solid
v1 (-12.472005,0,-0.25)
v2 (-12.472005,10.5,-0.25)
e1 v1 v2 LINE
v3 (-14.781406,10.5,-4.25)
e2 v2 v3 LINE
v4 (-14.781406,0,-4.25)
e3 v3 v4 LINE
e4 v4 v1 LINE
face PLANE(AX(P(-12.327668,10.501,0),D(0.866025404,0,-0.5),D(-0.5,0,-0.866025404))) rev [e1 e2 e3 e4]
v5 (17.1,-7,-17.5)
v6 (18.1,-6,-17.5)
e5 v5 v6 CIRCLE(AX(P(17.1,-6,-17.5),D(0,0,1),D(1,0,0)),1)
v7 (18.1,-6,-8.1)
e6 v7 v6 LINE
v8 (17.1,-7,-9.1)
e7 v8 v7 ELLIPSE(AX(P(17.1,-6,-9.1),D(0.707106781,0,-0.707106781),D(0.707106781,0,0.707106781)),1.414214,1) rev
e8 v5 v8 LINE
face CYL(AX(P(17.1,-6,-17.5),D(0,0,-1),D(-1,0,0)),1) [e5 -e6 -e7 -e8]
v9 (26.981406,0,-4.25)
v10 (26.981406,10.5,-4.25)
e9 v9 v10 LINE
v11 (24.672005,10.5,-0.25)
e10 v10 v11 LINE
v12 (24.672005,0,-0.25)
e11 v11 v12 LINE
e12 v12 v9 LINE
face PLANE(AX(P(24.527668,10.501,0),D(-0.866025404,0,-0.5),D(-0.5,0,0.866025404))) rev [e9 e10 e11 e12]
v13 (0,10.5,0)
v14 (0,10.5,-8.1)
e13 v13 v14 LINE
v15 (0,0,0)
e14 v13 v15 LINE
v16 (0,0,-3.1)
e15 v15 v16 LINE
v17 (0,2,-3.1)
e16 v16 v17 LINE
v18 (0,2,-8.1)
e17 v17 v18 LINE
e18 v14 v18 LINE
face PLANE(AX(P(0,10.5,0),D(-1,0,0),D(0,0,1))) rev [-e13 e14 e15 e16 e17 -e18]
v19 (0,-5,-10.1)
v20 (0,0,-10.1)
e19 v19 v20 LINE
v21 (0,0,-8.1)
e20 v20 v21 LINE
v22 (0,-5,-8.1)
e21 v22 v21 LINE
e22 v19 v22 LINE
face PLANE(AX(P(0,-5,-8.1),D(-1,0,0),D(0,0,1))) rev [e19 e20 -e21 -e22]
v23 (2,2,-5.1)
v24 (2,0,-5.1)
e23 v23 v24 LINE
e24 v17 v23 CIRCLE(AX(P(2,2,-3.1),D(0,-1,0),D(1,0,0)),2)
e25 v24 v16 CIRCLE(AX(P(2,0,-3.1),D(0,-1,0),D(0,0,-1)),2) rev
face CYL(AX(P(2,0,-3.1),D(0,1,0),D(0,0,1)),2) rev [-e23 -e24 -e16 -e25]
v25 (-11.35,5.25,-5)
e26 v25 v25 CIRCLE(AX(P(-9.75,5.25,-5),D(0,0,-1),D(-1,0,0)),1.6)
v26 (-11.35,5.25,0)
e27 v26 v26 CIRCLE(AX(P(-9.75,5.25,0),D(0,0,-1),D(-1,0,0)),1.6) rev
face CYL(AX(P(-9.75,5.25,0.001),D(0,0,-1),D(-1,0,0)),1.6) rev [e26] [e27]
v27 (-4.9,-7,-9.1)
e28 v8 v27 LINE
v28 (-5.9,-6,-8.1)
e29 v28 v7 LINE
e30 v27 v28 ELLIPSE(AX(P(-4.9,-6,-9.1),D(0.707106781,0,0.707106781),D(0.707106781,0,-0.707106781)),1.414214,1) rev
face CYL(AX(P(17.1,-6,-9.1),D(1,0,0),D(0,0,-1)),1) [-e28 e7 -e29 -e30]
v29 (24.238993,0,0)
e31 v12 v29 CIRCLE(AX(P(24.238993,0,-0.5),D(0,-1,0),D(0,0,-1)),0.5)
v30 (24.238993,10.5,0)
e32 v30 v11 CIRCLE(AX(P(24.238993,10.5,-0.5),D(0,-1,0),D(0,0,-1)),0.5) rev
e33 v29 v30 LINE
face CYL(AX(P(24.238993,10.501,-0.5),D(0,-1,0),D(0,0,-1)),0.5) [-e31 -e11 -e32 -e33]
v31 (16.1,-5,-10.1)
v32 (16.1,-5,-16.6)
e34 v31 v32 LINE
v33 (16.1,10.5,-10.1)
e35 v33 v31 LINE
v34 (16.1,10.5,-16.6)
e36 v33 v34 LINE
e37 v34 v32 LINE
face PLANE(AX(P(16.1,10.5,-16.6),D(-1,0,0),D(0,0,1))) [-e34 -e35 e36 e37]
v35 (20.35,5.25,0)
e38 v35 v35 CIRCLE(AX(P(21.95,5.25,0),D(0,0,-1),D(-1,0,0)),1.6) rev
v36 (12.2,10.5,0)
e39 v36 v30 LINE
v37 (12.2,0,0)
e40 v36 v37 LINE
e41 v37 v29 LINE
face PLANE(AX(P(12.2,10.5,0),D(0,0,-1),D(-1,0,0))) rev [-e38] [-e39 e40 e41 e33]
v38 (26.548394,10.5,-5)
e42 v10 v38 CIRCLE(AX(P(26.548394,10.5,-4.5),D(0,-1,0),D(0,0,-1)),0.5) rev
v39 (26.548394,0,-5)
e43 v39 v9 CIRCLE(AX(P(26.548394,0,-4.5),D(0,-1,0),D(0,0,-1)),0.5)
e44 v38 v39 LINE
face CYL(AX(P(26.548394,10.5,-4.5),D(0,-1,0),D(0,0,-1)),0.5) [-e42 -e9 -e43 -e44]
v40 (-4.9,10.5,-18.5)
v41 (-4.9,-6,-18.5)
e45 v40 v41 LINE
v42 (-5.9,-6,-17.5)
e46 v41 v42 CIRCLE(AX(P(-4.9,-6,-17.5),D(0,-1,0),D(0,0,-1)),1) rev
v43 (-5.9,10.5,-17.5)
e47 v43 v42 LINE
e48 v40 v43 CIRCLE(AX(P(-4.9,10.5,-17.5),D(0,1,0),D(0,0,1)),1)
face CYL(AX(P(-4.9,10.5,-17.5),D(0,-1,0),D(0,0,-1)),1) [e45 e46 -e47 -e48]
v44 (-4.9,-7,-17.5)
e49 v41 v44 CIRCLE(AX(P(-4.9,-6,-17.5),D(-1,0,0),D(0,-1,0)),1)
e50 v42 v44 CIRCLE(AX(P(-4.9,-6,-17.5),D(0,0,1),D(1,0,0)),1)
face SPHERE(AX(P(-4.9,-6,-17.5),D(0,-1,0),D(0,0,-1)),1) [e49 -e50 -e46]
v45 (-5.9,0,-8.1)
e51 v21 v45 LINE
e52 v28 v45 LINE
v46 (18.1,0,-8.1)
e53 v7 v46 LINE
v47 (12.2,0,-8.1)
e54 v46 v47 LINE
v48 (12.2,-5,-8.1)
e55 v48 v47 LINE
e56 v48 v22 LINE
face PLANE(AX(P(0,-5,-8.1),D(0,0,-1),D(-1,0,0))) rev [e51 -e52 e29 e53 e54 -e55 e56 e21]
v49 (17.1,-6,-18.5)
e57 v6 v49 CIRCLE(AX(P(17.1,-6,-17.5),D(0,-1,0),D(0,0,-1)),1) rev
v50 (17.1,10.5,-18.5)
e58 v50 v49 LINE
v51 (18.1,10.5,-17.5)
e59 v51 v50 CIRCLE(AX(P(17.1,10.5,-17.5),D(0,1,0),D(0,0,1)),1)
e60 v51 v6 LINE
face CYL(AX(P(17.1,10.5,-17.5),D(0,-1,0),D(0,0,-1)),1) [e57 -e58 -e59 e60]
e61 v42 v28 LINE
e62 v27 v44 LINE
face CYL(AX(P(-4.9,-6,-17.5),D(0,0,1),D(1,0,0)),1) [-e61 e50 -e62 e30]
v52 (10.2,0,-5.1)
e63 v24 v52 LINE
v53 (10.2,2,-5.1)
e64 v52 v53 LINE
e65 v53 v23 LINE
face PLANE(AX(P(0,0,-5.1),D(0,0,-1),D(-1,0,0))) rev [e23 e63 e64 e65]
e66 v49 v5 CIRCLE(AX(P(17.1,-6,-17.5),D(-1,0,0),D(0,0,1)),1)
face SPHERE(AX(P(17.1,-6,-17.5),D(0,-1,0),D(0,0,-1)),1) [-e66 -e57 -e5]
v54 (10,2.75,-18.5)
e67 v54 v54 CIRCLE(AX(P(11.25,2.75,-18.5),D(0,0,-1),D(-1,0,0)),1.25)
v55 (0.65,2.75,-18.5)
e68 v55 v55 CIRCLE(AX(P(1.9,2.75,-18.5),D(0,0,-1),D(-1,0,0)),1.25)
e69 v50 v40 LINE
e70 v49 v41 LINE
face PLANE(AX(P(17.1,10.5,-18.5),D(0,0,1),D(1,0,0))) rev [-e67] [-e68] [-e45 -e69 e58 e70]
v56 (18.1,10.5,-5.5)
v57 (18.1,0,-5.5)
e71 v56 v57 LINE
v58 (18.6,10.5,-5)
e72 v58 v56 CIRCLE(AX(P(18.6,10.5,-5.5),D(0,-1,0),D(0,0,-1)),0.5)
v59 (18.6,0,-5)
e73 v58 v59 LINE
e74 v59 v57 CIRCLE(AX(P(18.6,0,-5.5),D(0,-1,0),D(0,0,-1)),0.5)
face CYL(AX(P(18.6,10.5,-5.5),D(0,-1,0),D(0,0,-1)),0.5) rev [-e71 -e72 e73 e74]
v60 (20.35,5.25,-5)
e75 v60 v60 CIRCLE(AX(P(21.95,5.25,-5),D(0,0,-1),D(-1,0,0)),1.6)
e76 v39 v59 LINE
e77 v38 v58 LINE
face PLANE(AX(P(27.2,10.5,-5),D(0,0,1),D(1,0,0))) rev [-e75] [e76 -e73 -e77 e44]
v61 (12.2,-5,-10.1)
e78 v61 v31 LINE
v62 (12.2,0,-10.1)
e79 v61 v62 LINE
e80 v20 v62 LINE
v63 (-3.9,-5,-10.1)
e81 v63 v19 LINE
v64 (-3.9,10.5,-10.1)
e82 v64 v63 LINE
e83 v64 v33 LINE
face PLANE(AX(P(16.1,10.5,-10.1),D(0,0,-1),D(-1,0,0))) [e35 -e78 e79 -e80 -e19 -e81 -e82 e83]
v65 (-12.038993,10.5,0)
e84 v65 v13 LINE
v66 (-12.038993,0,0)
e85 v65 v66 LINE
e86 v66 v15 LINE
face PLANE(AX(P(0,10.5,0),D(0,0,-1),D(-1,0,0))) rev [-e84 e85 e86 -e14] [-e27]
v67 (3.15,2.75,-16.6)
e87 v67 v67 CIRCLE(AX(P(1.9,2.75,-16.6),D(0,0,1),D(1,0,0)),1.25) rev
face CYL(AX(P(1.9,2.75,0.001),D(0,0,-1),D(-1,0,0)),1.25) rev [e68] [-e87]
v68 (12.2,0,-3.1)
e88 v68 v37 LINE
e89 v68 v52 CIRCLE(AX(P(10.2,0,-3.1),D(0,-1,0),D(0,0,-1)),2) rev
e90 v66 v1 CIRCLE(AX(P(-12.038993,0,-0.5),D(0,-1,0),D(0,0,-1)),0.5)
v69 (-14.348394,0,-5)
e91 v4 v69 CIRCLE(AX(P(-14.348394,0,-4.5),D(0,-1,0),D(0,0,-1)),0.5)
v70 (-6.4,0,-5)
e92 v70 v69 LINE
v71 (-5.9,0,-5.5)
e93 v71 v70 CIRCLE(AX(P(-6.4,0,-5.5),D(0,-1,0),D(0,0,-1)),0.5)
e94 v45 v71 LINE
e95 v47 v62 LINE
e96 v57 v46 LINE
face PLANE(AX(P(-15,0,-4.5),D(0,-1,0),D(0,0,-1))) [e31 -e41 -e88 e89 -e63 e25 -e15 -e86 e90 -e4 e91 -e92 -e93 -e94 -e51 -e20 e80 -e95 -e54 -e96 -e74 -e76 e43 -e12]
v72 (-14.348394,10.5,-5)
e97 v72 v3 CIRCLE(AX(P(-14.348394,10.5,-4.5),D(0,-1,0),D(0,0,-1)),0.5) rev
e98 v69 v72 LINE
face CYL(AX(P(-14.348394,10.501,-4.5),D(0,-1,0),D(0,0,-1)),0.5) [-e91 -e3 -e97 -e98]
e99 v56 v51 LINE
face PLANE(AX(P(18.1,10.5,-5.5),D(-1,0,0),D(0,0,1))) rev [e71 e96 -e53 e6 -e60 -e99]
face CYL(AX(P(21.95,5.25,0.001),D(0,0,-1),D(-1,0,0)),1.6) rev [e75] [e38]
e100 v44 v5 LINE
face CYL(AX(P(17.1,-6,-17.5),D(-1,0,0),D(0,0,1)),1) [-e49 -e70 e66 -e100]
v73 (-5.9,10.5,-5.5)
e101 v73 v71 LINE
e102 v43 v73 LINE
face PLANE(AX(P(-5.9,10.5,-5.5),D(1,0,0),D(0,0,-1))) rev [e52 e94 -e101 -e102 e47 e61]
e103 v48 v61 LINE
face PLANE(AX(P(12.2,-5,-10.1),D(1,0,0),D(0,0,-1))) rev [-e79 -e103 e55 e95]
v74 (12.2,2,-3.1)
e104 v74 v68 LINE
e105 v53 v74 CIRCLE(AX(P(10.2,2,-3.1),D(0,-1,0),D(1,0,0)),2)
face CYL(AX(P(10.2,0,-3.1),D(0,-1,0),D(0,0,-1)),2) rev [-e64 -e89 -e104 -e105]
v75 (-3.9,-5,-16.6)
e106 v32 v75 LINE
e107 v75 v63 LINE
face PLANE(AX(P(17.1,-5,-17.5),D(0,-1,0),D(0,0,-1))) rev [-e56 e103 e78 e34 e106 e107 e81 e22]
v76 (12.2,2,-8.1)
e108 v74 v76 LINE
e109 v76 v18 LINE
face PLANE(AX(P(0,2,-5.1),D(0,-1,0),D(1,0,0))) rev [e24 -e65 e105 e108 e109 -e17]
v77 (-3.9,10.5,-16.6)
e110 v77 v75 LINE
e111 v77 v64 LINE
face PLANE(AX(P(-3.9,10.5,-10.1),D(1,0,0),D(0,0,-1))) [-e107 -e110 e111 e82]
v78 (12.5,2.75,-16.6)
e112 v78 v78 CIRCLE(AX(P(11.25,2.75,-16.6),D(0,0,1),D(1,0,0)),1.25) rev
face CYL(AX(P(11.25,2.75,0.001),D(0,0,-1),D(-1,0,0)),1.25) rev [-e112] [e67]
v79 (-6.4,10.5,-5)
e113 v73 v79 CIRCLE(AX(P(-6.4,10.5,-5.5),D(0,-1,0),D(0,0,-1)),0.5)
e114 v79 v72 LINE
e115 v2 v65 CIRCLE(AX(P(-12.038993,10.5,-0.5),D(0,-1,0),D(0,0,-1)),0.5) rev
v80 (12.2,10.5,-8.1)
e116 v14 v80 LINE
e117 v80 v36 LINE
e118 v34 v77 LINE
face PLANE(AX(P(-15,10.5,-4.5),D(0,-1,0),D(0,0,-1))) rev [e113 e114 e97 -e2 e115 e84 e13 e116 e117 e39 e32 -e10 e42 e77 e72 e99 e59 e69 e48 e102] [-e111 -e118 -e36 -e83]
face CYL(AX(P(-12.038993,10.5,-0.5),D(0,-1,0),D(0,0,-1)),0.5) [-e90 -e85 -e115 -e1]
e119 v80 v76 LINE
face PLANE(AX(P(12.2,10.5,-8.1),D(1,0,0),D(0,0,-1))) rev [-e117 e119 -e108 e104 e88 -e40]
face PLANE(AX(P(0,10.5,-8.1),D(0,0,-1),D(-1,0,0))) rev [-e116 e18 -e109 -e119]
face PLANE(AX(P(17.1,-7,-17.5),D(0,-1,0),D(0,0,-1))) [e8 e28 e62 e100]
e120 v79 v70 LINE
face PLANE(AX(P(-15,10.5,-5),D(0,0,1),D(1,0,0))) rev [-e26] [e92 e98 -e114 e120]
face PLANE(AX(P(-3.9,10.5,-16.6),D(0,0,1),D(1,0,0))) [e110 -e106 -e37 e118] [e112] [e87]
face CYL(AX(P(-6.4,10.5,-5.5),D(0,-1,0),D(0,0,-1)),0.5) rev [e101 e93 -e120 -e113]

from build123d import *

# Parameters (mm, degrees)
SKETCH1_W           = 20
SKETCH1_H           = 6.5
BOSS_EXTRUDE1_DEPTH = 10.5
BOSS_EXTRUDE2_START = 5
BOSS_EXTRUDE2_DEPTH = 5
BOSS_EXTRUDE3_START = 2
BOSS_EXTRUDE3_DEPTH = 2
SKETCH7_W           = 12.2
SKETCH7_H           = 2
BOSS_EXTRUDE5_DEPTH = 3
FILLET2_R           = 2
CUT_EXTRUDE2_REACH  = 34.554
SKETCH8_R           = 1.6
CUT_EXTRUDE3_REACH  = 36.925
FILLET8_R           = 0.5
FILLET9_R           = 1
CUT_EXTRUDE4_REACH  = 36.411
SKETCH10_R          = 1.25


with BuildPart() as part:
    # Sketch1 → Boss-Extrude1 (new body)
    with BuildSketch(Plane(origin=(0, 0, 0), x_dir=(1, 0, 0), z_dir=(0, 1, 0))):
        with BuildLine():
            Line((0, 0), (0, 8.1))
            Line((0, 8.1), (12.2, 8.1))
            Line((12.2, 8.1), (12.2, 0))
            Line((12.2, 0), (27.7, 0))
            Line((27.7, 0), (27.7, 4.5))
            ThreePointArc((27.7, 4.5), (27.553553391, 4.853553391), (27.2, 5))
            Line((27.2, 5), (18.6, 5))
            ThreePointArc((18.6, 5), (18.246446609, 5.146446609), (18.1, 5.5))
            Line((18.1, 5.5), (18.1, 17.5))
            ThreePointArc((18.1, 17.5), (17.807106781, 18.207106781), (17.1, 18.5))
            Line((17.1, 18.5), (-4.9, 18.5))
            ThreePointArc((-4.9, 18.5), (-5.607106781, 18.207106781), (-5.9, 17.5))
            Line((-5.9, 17.5), (-5.9, 5.5))
            ThreePointArc((-5.9, 5.5), (-6.046446609, 5.146446609), (-6.4, 5))
            Line((-6.4, 5), (-15, 5))
            ThreePointArc((-15, 5), (-15.353553391, 4.853553391), (-15.5, 4.5))
            Line((-15.5, 4.5), (-15.5, 0))
            Line((-15.5, 0), (0, 0))
        make_face()
        with Locations((6.1, 13.35)):
            Rectangle(SKETCH1_W, SKETCH1_H, mode=Mode.SUBTRACT)
    extrude(amount=BOSS_EXTRUDE1_DEPTH)

    # Sketch5 → Boss-Extrude2 (add)
    with BuildSketch(Plane.XZ.offset(BOSS_EXTRUDE2_START)):
        with BuildLine():
            Line((0, -8.1), (-5.9, -8.1))
            Line((-5.9, -8.1), (-5.9, -17.5))
            ThreePointArc((-5.9, -17.5), (-5.607106781, -18.207106781), (-4.9, -18.5))
            Line((-4.9, -18.5), (17.1, -18.5))
            ThreePointArc((17.1, -18.5), (17.807106781, -18.207106781), (18.1, -17.5))
            Line((18.1, -17.5), (18.1, -8.1))
            Line((18.1, -8.1), (12.2, -8.1))
            Line((12.2, -8.1), (12.2, -10.1))
            Line((12.2, -10.1), (16.1, -10.1))
            Line((16.1, -10.1), (16.1, -16.6))
            Line((16.1, -16.6), (-3.9, -16.6))
            Line((-3.9, -16.6), (-3.9, -10.1))
            Line((-3.9, -10.1), (0, -10.1))
            Line((0, -10.1), (0, -8.1))
        make_face()
    extrude(amount=-BOSS_EXTRUDE2_DEPTH)

    # Sketch6 → Boss-Extrude3 (add)
    with BuildSketch(Plane.XZ.offset(5).offset(BOSS_EXTRUDE3_START)):
        with BuildLine():
            Line((-5.9, -8.1), (18.1, -8.1))
            Line((18.1, -8.1), (18.1, -17.5))
            ThreePointArc((18.1, -17.5), (17.807106781, -18.207106781), (17.1, -18.5))
            Line((17.1, -18.5), (-4.9, -18.5))
            ThreePointArc((-4.9, -18.5), (-5.607106781, -18.207106781), (-5.9, -17.5))
            Line((-5.9, -17.5), (-5.9, -8.1))
        make_face()
    extrude(amount=-BOSS_EXTRUDE3_DEPTH)

    # Sketch7 → Boss-Extrude5 (add)
    with BuildSketch(Plane.XY.offset(-8.1)):
        with Locations((6.1, 1)):
            Rectangle(SKETCH7_W, SKETCH7_H)
    extrude(amount=BOSS_EXTRUDE5_DEPTH)

    # Fillet2
    fillet2_edges = [part.edges().sort_by_distance(p)[0] for p in [
        (12.2, 1, -5.1),
        (0, 1, -5.1),
    ]]
    fillet(fillet2_edges, radius=FILLET2_R)

    # Sketch8 → Cut-Extrude2 (cut, up to next)
    with BuildSketch(Plane(origin=(0, 0, -5), x_dir=(-1, 0, 0), z_dir=(0, 0, -1)), mode=Mode.PRIVATE) as cut_extrude2_sk1:
        with Locations((-21.95, 5.25)):
            Circle(SKETCH8_R)
    cut_extrude2_tool1 = extrude(cut_extrude2_sk1.sketch, amount=-CUT_EXTRUDE2_REACH, mode=Mode.PRIVATE) & part.part
    # Sketch8 → Cut-Extrude2 (cut, up to next)
    with BuildSketch(Plane(origin=(0, 0, -5), x_dir=(-1, 0, 0), z_dir=(0, 0, -1)), mode=Mode.PRIVATE) as cut_extrude2_sk2:
        with Locations((9.75, 5.25)):
            Circle(SKETCH8_R)
    cut_extrude2_tool2 = extrude(cut_extrude2_sk2.sketch, amount=-CUT_EXTRUDE2_REACH, mode=Mode.PRIVATE) & part.part
    add(cut_extrude2_tool1.solids().sort_by_distance((21.95, 5.25, -5))[0], mode=Mode.SUBTRACT)
    add(cut_extrude2_tool2.solids().sort_by_distance((-9.75, 5.25, -5))[0], mode=Mode.SUBTRACT)

    # Sketch9 → Cut-Extrude3 (cut, up to next)
    with BuildSketch(Plane.XZ, mode=Mode.PRIVATE) as cut_extrude3_sk1:
        with BuildLine():
            Line((24.52766766, 0), (27.392231541, -4.961570184))
            ThreePointArc((27.392231541, -4.961570184), (27.616002266, -4.777384417), (27.7, -4.5))
            Line((27.7, -4.5), (27.7, 0))
            Line((27.7, 0), (24.52766766, 0))
        make_face()
    cut_extrude3_tool1 = extrude(cut_extrude3_sk1.sketch, amount=-CUT_EXTRUDE3_REACH, mode=Mode.PRIVATE) & part.part
    # Sketch9 → Cut-Extrude3 (cut, up to next)
    with BuildSketch(Plane.XZ, mode=Mode.PRIVATE) as cut_extrude3_sk2:
        with BuildLine():
            Line((-12.327667659, 0), (-15.5, 0))
            Line((-15.5, 0), (-15.5, -4.5))
            ThreePointArc((-15.5, -4.5), (-15.416002266, -4.777384417), (-15.19223154, -4.961570184))
            Line((-15.19223154, -4.961570184), (-12.327667659, 0))
        make_face()
    cut_extrude3_tool2 = extrude(cut_extrude3_sk2.sketch, amount=-CUT_EXTRUDE3_REACH, mode=Mode.PRIVATE) & part.part
    add(cut_extrude3_tool1.solids().sort_by_distance((26.628979, 0, -1.786116))[0], mode=Mode.SUBTRACT)
    add(cut_extrude3_tool2.solids().sort_by_distance((-14.428979, 0, -1.786116))[0], mode=Mode.SUBTRACT)

    # Fillet8
    fillet8_edges = [part.edges().sort_by_distance(p)[0] for p in [
        (-12.327667659, 5.25, 0),
    ]]
    fillet(fillet8_edges, radius=FILLET8_R)
    fillet8_2_edges = [part.edges().sort_by_distance(p)[0] for p in [
        (-15.19223154, 5.25, -4.961570184),
    ]]
    fillet(fillet8_2_edges, radius=FILLET8_R)
    fillet8_3_edges = [part.edges().sort_by_distance(p)[0] for p in [
        (27.392231541, 5.25, -4.961570184),
    ]]
    fillet(fillet8_3_edges, radius=FILLET8_R)
    fillet8_4_edges = [part.edges().sort_by_distance(p)[0] for p in [
        (24.52766766, 5.25, 0),
    ]]
    fillet(fillet8_4_edges, radius=FILLET8_R)

    # Fillet9
    fillet9_edges = [part.edges().sort_by_distance(p)[0] for p in [
        (-5.9, -7, -12.8),
        (18.1, -7, -12.8),
        (6.1, -7, -8.1),
        (-5.607106781, -7, -18.207106781),
        (6.1, -7, -18.5),
        (17.807106781, -7, -18.207106781),
    ]]
    fillet(fillet9_edges, radius=FILLET9_R)

    # Sketch10 → Cut-Extrude4 (cut, up to next)
    with BuildSketch(Plane(origin=(0, 0, -18.5), x_dir=(-1, 0, 0), z_dir=(0, 0, -1)), mode=Mode.PRIVATE) as cut_extrude4_sk1:
        with Locations((-11.25, 2.75)):
            Circle(SKETCH10_R)
    cut_extrude4_tool1 = extrude(cut_extrude4_sk1.sketch, amount=-CUT_EXTRUDE4_REACH, mode=Mode.PRIVATE) & part.part
    # Sketch10 → Cut-Extrude4 (cut, up to next)
    with BuildSketch(Plane(origin=(0, 0, -18.5), x_dir=(-1, 0, 0), z_dir=(0, 0, -1)), mode=Mode.PRIVATE) as cut_extrude4_sk2:
        with Locations((-1.9, 2.75)):
            Circle(SKETCH10_R)
    cut_extrude4_tool2 = extrude(cut_extrude4_sk2.sketch, amount=-CUT_EXTRUDE4_REACH, mode=Mode.PRIVATE) & part.part
    add(cut_extrude4_tool1.solids().sort_by_distance((11.25, 2.75, -18.5))[0], mode=Mode.SUBTRACT)
    add(cut_extrude4_tool2.solids().sort_by_distance((1.9, 2.75, -18.5))[0], mode=Mode.SUBTRACT)


solid = part.part
